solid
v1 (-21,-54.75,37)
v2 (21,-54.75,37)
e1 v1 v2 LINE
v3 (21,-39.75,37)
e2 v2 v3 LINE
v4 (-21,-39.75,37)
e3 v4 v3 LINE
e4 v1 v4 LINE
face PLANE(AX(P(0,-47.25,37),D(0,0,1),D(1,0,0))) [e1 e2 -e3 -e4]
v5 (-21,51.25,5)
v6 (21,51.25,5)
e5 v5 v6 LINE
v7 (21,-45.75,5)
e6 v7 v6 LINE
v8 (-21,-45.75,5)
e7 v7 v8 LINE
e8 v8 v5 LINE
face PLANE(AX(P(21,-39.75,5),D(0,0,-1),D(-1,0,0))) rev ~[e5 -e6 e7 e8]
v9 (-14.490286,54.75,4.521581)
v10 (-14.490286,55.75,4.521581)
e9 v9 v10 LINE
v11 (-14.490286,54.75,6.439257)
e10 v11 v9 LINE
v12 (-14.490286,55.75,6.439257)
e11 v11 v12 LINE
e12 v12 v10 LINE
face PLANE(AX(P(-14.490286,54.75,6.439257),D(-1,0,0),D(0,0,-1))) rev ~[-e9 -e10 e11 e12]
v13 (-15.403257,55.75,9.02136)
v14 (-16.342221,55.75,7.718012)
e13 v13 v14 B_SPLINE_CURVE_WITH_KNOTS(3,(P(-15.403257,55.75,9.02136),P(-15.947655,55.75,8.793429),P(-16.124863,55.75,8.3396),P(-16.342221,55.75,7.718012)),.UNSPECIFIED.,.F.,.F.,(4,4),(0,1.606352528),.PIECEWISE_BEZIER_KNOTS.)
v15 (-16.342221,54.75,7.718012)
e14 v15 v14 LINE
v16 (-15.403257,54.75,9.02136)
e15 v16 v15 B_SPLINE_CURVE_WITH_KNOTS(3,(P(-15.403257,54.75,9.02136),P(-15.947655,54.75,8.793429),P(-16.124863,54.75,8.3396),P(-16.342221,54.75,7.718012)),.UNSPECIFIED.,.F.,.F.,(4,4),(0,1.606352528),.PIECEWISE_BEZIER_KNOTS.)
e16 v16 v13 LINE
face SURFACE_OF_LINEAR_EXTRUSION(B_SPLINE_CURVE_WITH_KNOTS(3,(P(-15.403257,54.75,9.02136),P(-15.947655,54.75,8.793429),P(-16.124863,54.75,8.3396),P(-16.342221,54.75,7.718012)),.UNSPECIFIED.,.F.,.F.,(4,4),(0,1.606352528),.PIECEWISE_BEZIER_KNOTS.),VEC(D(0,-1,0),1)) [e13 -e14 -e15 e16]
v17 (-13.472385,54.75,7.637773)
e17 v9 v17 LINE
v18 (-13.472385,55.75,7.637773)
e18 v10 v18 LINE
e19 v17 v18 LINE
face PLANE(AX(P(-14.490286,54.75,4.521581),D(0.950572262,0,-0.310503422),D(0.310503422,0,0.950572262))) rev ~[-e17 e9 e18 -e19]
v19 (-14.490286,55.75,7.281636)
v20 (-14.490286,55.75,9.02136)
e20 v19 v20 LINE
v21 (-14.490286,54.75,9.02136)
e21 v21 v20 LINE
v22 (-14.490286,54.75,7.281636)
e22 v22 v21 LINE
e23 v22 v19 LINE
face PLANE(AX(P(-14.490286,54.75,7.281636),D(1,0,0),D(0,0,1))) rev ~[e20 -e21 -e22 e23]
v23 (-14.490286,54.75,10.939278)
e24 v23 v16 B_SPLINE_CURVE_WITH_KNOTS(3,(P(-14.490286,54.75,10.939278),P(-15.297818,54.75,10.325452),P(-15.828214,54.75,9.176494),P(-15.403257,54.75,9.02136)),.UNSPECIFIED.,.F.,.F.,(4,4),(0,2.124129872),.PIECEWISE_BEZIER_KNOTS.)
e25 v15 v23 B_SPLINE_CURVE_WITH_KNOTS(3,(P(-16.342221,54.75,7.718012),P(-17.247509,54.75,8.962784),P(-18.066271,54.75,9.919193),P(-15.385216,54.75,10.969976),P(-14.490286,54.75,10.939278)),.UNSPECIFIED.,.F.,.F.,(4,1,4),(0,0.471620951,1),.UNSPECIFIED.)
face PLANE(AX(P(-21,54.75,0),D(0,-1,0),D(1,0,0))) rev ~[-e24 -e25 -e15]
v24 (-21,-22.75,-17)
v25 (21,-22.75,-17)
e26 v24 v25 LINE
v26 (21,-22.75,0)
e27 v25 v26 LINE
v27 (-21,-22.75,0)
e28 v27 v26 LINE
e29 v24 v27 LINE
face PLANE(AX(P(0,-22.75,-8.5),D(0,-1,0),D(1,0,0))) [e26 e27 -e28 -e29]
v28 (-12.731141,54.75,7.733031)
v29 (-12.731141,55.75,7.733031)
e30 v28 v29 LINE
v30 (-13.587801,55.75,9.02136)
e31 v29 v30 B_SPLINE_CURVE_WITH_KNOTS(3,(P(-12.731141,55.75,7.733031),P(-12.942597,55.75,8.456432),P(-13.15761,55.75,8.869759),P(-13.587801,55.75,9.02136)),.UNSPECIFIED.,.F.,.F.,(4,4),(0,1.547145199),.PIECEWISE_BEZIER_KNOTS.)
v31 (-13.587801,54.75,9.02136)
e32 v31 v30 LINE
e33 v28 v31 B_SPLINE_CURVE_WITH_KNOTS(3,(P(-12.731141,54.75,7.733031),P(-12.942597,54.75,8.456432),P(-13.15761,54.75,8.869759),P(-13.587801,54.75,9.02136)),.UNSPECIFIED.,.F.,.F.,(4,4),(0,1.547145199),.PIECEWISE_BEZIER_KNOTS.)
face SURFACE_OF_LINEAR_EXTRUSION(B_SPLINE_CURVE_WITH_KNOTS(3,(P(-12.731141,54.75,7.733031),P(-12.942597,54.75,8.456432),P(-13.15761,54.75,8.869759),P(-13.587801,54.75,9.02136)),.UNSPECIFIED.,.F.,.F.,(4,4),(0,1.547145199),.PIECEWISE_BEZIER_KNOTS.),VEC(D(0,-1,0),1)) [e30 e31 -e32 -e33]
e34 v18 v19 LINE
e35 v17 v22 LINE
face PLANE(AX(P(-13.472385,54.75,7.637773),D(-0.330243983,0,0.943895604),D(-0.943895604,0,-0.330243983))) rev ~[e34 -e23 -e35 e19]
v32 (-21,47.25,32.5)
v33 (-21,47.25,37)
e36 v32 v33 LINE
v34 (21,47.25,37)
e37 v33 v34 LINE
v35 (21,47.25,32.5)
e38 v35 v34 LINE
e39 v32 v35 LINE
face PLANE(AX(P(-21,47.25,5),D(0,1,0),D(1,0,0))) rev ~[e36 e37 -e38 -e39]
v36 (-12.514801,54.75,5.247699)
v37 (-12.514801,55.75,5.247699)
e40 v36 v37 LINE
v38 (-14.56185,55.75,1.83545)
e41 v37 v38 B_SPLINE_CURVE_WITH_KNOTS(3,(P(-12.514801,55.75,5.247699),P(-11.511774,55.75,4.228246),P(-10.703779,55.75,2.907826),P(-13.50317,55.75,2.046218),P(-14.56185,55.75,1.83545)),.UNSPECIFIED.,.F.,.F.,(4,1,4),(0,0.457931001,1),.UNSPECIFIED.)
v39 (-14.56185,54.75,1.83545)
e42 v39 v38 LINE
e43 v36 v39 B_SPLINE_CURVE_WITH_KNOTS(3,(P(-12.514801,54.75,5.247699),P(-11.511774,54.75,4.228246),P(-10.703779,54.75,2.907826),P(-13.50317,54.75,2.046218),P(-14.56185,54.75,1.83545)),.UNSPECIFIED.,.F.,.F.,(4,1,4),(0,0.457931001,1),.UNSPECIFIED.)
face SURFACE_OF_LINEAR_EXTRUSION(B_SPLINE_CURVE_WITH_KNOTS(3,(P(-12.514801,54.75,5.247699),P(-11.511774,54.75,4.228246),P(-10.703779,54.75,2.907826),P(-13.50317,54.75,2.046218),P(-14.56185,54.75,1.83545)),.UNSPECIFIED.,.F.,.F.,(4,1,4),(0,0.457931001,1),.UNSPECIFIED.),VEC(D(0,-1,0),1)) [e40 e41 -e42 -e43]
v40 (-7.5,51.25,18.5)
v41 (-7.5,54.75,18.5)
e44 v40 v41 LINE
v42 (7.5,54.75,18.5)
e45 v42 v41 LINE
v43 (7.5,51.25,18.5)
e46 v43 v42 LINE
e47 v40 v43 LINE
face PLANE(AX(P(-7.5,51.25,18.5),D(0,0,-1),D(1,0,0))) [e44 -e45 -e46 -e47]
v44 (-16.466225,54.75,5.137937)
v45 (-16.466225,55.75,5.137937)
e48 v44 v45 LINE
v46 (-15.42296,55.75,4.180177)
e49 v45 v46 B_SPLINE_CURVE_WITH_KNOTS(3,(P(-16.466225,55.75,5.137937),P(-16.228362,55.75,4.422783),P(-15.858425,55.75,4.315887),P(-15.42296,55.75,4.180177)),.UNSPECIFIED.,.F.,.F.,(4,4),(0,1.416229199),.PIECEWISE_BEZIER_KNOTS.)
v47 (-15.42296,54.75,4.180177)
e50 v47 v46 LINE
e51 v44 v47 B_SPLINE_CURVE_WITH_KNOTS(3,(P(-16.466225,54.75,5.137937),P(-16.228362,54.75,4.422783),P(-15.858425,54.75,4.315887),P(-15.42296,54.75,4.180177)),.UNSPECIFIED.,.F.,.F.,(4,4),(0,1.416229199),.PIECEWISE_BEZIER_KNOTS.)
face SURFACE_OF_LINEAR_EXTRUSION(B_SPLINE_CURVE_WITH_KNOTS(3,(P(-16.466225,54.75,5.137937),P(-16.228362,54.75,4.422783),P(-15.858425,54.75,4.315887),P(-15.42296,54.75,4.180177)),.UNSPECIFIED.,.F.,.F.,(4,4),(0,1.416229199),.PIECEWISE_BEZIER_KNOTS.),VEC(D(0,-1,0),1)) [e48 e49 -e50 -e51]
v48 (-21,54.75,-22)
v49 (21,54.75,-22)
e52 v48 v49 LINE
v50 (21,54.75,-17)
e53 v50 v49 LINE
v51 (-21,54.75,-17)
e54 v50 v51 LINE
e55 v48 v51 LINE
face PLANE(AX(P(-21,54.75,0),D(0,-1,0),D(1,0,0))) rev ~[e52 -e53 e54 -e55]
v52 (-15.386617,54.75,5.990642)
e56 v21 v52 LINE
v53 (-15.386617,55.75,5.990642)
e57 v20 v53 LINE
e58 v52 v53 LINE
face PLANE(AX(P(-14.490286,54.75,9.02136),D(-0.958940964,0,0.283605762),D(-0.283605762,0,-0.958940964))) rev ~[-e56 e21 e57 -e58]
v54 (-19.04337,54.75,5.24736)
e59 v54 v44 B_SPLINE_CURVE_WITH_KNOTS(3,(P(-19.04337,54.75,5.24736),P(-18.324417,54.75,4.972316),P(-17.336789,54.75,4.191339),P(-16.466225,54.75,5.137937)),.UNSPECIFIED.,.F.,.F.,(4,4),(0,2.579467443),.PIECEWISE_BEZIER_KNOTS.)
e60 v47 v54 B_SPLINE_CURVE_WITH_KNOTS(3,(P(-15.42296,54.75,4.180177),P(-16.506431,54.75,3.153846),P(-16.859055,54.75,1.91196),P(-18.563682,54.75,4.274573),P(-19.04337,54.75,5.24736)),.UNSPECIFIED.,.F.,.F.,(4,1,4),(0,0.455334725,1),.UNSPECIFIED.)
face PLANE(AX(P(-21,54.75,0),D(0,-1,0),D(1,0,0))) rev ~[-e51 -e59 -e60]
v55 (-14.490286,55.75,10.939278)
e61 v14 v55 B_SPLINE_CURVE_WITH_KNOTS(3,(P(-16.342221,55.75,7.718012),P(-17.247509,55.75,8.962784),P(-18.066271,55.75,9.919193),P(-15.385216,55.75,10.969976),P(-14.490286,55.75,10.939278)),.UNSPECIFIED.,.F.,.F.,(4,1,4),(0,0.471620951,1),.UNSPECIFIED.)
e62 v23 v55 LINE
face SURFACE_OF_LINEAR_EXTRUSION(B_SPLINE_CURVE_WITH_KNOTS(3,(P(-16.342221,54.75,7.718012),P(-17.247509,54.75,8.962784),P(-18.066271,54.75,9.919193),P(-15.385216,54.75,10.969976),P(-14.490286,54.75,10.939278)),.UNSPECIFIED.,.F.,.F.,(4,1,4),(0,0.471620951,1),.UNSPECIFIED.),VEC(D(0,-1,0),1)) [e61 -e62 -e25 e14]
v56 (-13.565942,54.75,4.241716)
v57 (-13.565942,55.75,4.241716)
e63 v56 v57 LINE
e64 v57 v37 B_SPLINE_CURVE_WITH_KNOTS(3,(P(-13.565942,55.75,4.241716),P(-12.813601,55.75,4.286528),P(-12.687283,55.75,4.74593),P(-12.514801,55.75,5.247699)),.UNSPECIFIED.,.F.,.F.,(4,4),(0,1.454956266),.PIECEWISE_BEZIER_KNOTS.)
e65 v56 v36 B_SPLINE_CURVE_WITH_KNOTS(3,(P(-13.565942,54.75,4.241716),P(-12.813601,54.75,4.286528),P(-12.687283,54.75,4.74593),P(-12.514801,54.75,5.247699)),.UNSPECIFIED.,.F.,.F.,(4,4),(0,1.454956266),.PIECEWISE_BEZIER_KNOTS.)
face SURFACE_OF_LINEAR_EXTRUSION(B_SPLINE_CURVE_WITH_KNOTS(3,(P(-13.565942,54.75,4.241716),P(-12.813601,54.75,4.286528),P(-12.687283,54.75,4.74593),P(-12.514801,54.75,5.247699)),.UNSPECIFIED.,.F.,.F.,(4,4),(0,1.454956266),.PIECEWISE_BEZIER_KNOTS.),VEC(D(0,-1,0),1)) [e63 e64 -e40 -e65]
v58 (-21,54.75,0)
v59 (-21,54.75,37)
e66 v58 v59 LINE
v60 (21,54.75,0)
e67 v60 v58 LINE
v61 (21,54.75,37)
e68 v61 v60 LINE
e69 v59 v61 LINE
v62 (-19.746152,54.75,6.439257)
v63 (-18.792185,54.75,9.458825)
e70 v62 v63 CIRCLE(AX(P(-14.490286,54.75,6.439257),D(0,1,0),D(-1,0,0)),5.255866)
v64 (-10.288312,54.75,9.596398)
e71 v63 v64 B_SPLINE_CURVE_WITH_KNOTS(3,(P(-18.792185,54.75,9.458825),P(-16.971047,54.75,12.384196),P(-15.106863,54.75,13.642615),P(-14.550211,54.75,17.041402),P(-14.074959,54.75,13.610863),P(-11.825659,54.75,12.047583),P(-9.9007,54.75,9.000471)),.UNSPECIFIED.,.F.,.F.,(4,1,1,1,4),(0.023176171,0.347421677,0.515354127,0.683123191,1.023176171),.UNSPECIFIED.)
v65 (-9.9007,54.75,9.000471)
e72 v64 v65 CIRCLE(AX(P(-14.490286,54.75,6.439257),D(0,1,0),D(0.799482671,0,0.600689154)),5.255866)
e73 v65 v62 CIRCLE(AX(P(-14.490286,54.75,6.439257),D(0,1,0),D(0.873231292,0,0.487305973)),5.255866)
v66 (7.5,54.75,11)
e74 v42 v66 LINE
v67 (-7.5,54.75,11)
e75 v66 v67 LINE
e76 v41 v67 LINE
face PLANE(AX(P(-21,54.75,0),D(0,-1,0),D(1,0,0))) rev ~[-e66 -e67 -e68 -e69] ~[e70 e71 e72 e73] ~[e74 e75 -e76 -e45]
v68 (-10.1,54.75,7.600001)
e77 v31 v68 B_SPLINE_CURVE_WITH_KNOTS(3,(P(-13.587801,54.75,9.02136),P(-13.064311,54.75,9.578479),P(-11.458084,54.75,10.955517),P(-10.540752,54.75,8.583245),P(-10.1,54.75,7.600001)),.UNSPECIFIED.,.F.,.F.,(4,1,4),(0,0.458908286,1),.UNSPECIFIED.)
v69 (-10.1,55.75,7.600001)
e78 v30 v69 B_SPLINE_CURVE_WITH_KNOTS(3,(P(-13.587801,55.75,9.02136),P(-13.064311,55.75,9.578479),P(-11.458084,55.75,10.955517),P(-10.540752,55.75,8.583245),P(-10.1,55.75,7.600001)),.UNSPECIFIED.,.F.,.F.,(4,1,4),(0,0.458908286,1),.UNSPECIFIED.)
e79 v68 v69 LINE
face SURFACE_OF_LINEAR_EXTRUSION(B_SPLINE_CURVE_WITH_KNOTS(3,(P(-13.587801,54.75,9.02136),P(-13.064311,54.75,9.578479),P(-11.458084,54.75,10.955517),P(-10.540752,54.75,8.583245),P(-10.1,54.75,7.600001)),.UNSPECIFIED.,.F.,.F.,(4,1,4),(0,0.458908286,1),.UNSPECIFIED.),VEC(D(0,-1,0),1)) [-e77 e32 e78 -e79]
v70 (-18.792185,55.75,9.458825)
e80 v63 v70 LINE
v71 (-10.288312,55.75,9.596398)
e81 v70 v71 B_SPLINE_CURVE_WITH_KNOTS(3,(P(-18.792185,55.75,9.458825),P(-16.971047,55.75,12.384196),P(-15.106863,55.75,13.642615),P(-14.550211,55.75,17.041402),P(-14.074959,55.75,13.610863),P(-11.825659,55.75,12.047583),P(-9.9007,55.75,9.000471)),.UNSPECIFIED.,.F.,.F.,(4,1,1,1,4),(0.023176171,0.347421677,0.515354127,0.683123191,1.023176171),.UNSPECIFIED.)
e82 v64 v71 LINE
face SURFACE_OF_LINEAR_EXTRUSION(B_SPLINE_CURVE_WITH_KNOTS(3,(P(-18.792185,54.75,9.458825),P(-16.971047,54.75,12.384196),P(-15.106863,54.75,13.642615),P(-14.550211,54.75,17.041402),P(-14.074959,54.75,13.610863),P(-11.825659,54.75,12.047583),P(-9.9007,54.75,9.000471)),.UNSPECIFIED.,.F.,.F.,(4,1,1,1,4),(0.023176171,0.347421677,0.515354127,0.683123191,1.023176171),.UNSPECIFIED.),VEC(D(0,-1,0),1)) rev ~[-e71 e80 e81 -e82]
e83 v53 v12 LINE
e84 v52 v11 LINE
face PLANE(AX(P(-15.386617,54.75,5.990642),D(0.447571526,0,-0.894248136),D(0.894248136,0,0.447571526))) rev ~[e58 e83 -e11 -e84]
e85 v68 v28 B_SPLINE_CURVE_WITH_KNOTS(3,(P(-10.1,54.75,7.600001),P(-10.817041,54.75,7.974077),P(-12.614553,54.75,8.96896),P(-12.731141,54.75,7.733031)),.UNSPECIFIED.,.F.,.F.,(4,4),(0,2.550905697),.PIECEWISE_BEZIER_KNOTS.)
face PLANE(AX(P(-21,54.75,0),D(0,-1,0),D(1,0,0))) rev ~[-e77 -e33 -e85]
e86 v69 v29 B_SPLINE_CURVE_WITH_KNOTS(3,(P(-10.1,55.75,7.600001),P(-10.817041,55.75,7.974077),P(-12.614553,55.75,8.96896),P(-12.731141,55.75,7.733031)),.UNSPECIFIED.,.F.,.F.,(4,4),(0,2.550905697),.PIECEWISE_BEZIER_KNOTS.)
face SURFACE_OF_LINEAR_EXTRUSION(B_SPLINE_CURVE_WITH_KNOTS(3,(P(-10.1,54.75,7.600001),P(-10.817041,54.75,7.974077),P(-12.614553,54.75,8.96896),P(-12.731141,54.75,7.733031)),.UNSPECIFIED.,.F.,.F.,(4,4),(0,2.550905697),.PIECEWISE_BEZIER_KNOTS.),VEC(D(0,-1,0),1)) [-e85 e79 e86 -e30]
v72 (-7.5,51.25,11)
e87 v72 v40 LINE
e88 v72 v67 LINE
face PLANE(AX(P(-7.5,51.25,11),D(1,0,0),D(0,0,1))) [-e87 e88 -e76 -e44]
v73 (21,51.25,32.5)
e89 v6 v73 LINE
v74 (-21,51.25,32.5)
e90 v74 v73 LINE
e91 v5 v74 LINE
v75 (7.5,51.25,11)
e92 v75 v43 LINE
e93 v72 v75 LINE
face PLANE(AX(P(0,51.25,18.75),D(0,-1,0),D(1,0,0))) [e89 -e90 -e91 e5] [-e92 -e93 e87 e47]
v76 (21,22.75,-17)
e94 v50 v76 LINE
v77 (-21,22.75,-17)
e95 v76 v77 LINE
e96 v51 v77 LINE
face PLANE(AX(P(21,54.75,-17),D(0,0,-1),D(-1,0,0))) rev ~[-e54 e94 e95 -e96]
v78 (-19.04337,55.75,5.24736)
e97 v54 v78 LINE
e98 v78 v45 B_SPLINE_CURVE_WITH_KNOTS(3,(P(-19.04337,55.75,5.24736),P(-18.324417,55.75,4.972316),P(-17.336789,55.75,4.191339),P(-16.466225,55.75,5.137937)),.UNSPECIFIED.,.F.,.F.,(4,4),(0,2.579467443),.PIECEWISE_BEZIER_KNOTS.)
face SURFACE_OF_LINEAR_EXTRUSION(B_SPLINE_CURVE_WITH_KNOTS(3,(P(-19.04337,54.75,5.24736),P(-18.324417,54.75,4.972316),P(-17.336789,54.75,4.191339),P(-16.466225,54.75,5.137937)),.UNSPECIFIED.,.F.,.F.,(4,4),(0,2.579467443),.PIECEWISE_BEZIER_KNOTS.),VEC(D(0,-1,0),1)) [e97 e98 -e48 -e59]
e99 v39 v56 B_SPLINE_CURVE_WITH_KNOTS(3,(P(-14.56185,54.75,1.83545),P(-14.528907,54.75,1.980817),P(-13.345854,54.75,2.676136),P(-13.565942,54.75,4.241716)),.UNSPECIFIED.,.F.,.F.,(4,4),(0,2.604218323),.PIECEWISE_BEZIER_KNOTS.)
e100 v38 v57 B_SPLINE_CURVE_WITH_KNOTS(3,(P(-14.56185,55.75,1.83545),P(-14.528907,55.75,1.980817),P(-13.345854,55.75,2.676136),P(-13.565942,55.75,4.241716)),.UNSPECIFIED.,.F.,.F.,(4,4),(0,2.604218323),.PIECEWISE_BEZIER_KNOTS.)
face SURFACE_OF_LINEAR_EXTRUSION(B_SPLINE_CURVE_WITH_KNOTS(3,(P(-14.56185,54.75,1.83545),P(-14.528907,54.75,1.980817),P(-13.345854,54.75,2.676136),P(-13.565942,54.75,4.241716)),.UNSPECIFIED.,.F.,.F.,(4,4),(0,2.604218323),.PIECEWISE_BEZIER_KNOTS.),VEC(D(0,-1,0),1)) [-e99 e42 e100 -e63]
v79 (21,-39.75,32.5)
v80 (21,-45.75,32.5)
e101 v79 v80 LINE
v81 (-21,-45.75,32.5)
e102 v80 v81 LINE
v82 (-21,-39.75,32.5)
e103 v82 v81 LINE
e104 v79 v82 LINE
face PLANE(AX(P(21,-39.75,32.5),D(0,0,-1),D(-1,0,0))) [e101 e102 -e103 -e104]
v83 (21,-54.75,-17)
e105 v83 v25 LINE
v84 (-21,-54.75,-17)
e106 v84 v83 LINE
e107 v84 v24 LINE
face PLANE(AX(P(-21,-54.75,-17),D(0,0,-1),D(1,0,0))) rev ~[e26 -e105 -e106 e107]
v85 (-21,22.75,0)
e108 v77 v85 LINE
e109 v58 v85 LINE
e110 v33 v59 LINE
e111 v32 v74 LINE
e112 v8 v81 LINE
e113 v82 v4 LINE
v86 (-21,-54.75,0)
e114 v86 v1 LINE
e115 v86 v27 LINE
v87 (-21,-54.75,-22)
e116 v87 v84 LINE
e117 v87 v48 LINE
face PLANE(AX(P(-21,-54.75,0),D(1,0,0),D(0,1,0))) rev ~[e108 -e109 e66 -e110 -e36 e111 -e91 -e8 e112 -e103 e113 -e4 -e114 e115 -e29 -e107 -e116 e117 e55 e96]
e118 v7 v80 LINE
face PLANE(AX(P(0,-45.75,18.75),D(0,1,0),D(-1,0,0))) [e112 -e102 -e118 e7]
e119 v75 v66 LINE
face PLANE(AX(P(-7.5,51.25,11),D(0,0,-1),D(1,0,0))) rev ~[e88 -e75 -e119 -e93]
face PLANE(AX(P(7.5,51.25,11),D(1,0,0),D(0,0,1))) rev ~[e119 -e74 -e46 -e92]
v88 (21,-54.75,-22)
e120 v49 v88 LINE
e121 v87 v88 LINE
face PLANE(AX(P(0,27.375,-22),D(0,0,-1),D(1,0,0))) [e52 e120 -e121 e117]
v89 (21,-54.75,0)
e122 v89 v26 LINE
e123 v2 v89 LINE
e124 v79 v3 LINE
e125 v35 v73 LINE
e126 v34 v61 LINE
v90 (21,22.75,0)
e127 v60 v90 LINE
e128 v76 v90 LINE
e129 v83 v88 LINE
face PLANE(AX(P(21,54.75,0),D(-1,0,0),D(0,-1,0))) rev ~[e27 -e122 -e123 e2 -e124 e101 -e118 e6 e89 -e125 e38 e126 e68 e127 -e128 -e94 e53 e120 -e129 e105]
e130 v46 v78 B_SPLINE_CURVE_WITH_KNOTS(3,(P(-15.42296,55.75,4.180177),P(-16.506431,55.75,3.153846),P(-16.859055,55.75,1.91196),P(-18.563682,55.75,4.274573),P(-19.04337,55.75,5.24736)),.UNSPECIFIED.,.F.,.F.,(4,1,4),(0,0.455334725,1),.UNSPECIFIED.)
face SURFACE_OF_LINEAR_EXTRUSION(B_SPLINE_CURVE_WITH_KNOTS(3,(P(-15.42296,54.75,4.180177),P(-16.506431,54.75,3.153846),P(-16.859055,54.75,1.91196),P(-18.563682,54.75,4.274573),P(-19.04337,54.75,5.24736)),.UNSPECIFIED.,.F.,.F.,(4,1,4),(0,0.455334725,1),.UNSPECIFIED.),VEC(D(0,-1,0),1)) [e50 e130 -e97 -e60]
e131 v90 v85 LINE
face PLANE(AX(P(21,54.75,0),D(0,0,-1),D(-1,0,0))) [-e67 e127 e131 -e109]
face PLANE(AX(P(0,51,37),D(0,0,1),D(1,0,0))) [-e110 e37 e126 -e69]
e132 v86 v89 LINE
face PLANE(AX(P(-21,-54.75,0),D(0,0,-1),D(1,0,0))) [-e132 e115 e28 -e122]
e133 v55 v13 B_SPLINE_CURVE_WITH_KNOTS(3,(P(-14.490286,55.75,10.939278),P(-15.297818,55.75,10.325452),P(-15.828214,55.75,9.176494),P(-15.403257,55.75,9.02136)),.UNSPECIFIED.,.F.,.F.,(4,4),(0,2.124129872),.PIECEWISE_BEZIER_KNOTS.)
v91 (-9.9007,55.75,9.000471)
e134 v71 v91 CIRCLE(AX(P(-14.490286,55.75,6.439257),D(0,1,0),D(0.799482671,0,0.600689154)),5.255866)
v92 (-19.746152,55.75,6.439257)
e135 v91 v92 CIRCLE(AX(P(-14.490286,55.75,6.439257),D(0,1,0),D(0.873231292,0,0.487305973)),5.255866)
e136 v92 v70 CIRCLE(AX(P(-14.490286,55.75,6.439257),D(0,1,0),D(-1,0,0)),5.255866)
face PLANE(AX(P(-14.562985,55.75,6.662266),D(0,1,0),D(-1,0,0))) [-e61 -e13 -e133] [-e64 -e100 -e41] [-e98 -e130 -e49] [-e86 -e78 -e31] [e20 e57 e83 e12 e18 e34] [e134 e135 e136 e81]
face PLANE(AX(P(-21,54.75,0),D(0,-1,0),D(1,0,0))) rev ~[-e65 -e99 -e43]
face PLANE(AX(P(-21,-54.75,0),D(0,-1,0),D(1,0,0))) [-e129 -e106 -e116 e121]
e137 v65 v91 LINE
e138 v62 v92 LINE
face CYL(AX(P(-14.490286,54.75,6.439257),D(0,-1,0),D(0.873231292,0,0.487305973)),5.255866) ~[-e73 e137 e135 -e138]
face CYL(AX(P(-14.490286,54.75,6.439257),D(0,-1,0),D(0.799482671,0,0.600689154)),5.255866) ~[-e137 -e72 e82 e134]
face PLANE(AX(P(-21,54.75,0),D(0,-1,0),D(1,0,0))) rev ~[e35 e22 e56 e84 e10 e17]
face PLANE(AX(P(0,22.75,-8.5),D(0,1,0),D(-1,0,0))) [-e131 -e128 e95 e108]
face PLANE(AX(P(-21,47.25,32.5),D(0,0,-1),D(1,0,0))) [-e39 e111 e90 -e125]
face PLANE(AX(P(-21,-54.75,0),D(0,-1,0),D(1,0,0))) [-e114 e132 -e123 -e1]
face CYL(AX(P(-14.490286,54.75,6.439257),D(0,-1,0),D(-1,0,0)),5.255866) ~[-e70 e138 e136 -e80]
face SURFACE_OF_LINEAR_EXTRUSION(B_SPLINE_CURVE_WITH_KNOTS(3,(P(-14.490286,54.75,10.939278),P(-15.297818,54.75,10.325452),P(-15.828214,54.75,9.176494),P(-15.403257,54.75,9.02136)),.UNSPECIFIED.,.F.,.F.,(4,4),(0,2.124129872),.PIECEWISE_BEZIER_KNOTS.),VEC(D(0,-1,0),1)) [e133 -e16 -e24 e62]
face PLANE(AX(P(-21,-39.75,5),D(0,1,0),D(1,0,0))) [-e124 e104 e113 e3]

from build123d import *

# Parameters (mm, degrees)
F0_W      = 42
F0_H      = 109.5
F1_DEPTH  = 5
F2_W      = 42
F2_H      = 7.5
F2_H_2    = 15
F3_DEPTH  = 32
F4_W      = 42
F4_H      = 27.5
F5_DEPTH  = 4
F6_W      = 42
F6_H      = 27.5
F7_DEPTH  = 6
F8_W      = 15
F8_H      = 7.5
F9_DEPTH  = 3.501
F10_W     = 42
F10_H     = 54.75
F11_DEPTH = 22
F12_W     = 42
F12_H     = 17
F13_DEPTH = 32
F14_W     = 42
F14_H     = 17
F15_DEPTH = 32
F17_DEPTH = 1


# Not quite as in the source:
# - a feature names something its author has since deleted; it is built from what else it names


with BuildPart() as f1:
    # F0 (on Top) → F1 (new body)
    with BuildSketch(Plane.XY):
        Rectangle(F0_W, F0_H)
    extrude(amount=F1_DEPTH)

    # F2 (on face) → F3 (join)
    with BuildSketch(Plane.XY.offset(5)):
        with Locations((0, 51)):
            Rectangle(F2_W, F2_H)
        with Locations((0, -47.25)):
            Rectangle(F2_W, F2_H_2)
    extrude(amount=F3_DEPTH)

    # F4 (on face) → F5 (cut)
    with BuildSketch(Plane.XZ.offset(-47.25)):
        with Locations((0, 18.75)):
            Rectangle(F4_W, F4_H)
    extrude(amount=-F5_DEPTH, mode=Mode.SUBTRACT)

    # F6 (on face) → F7 (cut)
    with BuildSketch(Plane(origin=(0, -39.75, 0), x_dir=(-1, 0, 0), z_dir=(0, 1, 0))):
        with Locations((0, 18.75)):
            Rectangle(F6_W, F6_H)
    extrude(amount=-F7_DEPTH, mode=Mode.SUBTRACT)

    # F8 (on face) → F9 (cut, through all)
    with BuildSketch(Plane.XZ.offset(-51.25)):
        with Locations((0, 14.75)):
            Rectangle(F8_W, F8_H)
    extrude(amount=-F9_DEPTH, mode=Mode.SUBTRACT)

    # F10 (on face) → F11 (join)
    with BuildSketch(Plane(origin=(0, 0, 0), x_dir=(1, 0, 0), z_dir=(0, 0, -1))):
        with Locations((0, -27.375)):
            Rectangle(F10_W, F10_H)
        with Locations((0, 27.375)):
            Rectangle(F10_W, F10_H)
    extrude(amount=F11_DEPTH)

    # F12 (on face) → F13 (cut)
    with BuildSketch(Plane(origin=(0, 54.75, 0), x_dir=(-1, 0, 0), z_dir=(0, 1, 0))):
        with Locations((0, -8.5)):
            Rectangle(F12_W, F12_H)
    extrude(amount=-F13_DEPTH, mode=Mode.SUBTRACT)

    # F14 (on face) → F15 (cut)
    with BuildSketch(Plane.XZ.offset(54.75)):
        with Locations((0, -8.5)):
            Rectangle(F14_W, F14_H)
    extrude(amount=-F15_DEPTH, mode=Mode.SUBTRACT)

    # F16 (on face) → F17 (join)
    with BuildSketch(Plane(origin=(0, 54.75, 0), x_dir=(-1, 0, 0), z_dir=(0, 1, 0))):
        with BuildLine():
            ThreePointArc((9.9006995692, 9.0004714316), (13.1670561221, 1.352687349), (19.7461517383, 6.4392566621))
            ThreePointArc((19.7461517383, 6.4392566621), (19.5019885984, 8.0225954525), (18.7921845523, 9.458825093))
            ThreePointArc((18.7921845523, 9.458825093), (14.575302704, 11.6944347601), (10.2883124178, 9.5963982037))
            add(Edge.make_bspline(
                [(9.9006995692, 9.0004714316), (10.0318943543, 9.2081460376), (10.1611439812, 9.4065291941), (10.2883124178, 9.5963982037)],
                knots=[0, 0, 0, 0, 0.0231761706, 0.0231761706, 0.0231761706, 0.0231761706], degree=3))
        make_face()
        with BuildLine():
            add(Edge.make_bspline(
                [(12.5148005536, 5.2476986911), (11.5117744305, 4.2282460665), (10.7037792288, 2.9078259209), (13.5031697151, 2.0462179781), (14.5618504929, 1.8354499162)],
                knots=[0, 0, 0, 0, 0.4579310006, 1, 1, 1, 1], degree=3))
            add(Edge.make_bspline(
                [(13.5659415486, 4.241716412), (12.8136013619, 4.2865276682), (12.6872834074, 4.7459304754), (12.5148005536, 5.2476986911)],
                knots=[0, 0, 0, 0, 1.4549562665, 1.4549562665, 1.4549562665, 1.4549562665], degree=3))
            add(Edge.make_bspline(
                [(14.5618504929, 1.8354499162), (14.5289066888, 1.9808173354), (13.3458541311, 2.6761364671), (13.5659415486, 4.241716412)],
                knots=[0, 0, 0, 0, 2.604218323, 2.604218323, 2.604218323, 2.604218323], degree=3))
        make_face(mode=Mode.SUBTRACT)
        Polygon((13.47238521, 7.6377728132), (14.4902859979, 7.2816363839), (14.4902859979, 9.0213598503), (15.3866174204, 5.9906424503), (14.4902859979, 6.4392566621), (14.4902859979, 4.5215808953), align=None, mode=Mode.SUBTRACT)
        with BuildLine():
            add(Edge.make_bspline(
                [(15.4229601255, 4.1801771125), (16.5064311467, 3.1538456327), (16.8590547707, 1.9119603138), (18.5636819849, 4.2745726241), (19.0433704887, 5.2473602224)],
                knots=[0, 0, 0, 0, 0.4553347248, 1, 1, 1, 1], degree=3))
            add(Edge.make_bspline(
                [(16.4662250147, 5.1379367456), (16.2283618655, 4.4227829667), (15.8584250881, 4.3158873473), (15.4229601255, 4.1801771125)],
                knots=[0, 0, 0, 0, 1.4162291989, 1.4162291989, 1.4162291989, 1.4162291989], degree=3))
            add(Edge.make_bspline(
                [(19.0433704887, 5.2473602224), (18.3244173567, 4.9723164216), (17.3367887913, 4.1913386793), (16.4662250147, 5.1379367456)],
                knots=[0, 0, 0, 0, 2.5794674433, 2.5794674433, 2.5794674433, 2.5794674433], degree=3))
        make_face(mode=Mode.SUBTRACT)
        with BuildLine():
            add(Edge.make_bspline(
                [(13.5878011524, 9.0213598503), (13.0643112241, 9.5784787958), (11.4580836083, 10.9555165738), (10.5407517819, 8.58324464), (10.0999996066, 7.6000010595)],
                knots=[0, 0, 0, 0, 0.4589082861, 1, 1, 1, 1], degree=3))
            add(Edge.make_bspline(
                [(12.7311412425, 7.7330306741), (12.9425972845, 8.4564324625), (13.1576102672, 8.8697590463), (13.5878011524, 9.0213598503)],
                knots=[0, 0, 0, 0, 1.5471451992, 1.5471451992, 1.5471451992, 1.5471451992], degree=3))
            add(Edge.make_bspline(
                [(10.0999996066, 7.6000010595), (10.8170407506, 7.9740767086), (12.6145526151, 8.968960396), (12.7311412425, 7.7330306741)],
                knots=[0, 0, 0, 0, 2.5509056967, 2.5509056967, 2.5509056967, 2.5509056967], degree=3))
        make_face(mode=Mode.SUBTRACT)
        with BuildLine():
            add(Edge.make_bspline(
                [(16.3422210337, 7.7180123234), (17.2475090665, 8.9627835512), (18.0662711639, 9.9191930916), (15.3852159818, 10.9699756355), (14.4902859979, 10.9392784796)],
                knots=[0, 0, 0, 0, 0.4716209514, 1, 1, 1, 1], degree=3))
            add(Edge.make_bspline(
                [(15.403256887, 9.0213598503), (15.9476549795, 8.7934285242), (16.1248632097, 8.3395995036), (16.3422210337, 7.7180123234)],
                knots=[0, 0, 0, 0, 1.6063525282, 1.6063525282, 1.6063525282, 1.6063525282], degree=3))
            add(Edge.make_bspline(
                [(14.4902859979, 10.9392784796), (15.2978175145, 10.325451744), (15.8282139034, 9.1764941327), (15.403256887, 9.0213598503)],
                knots=[0, 0, 0, 0, 2.1241298719, 2.1241298719, 2.1241298719, 2.1241298719], degree=3))
        make_face(mode=Mode.SUBTRACT)
        with BuildLine():
            ThreePointArc((10.2883124178, 9.5963982037), (14.575302704, 11.6944347601), (18.7921845523, 9.458825093))
            add(Edge.make_bspline(
                [(10.2883124178, 9.5963982037), (12.0270262465, 12.1923872829), (14.0912584145, 13.7285191545), (14.5502114191, 17.0414015202), (15.1068634627, 13.6426153488), (16.9710466455, 12.3841964531), (18.7921845523, 9.458825093)],
                knots=[0.0231761706, 0.0231761706, 0.0231761706, 0.0231761706, 0.3400529794, 0.5078220439, 0.6757544935, 1, 1, 1, 1], degree=3))
        make_face()
        with BuildLine():
            ThreePointArc((10.2883124178, 9.5963982037), (10.0844189973, 9.3049957736), (9.9006995692, 9.0004714316))
            add(Edge.make_bspline(
                [(9.9006995692, 9.0004714316), (10.0318943543, 9.2081460376), (10.1611439812, 9.4065291941), (10.2883124178, 9.5963982037)],
                knots=[0, 0, 0, 0, 0.0231761706, 0.0231761706, 0.0231761706, 0.0231761706], degree=3))
        make_face()
    extrude(amount=F17_DEPTH)


solid = f1.part
